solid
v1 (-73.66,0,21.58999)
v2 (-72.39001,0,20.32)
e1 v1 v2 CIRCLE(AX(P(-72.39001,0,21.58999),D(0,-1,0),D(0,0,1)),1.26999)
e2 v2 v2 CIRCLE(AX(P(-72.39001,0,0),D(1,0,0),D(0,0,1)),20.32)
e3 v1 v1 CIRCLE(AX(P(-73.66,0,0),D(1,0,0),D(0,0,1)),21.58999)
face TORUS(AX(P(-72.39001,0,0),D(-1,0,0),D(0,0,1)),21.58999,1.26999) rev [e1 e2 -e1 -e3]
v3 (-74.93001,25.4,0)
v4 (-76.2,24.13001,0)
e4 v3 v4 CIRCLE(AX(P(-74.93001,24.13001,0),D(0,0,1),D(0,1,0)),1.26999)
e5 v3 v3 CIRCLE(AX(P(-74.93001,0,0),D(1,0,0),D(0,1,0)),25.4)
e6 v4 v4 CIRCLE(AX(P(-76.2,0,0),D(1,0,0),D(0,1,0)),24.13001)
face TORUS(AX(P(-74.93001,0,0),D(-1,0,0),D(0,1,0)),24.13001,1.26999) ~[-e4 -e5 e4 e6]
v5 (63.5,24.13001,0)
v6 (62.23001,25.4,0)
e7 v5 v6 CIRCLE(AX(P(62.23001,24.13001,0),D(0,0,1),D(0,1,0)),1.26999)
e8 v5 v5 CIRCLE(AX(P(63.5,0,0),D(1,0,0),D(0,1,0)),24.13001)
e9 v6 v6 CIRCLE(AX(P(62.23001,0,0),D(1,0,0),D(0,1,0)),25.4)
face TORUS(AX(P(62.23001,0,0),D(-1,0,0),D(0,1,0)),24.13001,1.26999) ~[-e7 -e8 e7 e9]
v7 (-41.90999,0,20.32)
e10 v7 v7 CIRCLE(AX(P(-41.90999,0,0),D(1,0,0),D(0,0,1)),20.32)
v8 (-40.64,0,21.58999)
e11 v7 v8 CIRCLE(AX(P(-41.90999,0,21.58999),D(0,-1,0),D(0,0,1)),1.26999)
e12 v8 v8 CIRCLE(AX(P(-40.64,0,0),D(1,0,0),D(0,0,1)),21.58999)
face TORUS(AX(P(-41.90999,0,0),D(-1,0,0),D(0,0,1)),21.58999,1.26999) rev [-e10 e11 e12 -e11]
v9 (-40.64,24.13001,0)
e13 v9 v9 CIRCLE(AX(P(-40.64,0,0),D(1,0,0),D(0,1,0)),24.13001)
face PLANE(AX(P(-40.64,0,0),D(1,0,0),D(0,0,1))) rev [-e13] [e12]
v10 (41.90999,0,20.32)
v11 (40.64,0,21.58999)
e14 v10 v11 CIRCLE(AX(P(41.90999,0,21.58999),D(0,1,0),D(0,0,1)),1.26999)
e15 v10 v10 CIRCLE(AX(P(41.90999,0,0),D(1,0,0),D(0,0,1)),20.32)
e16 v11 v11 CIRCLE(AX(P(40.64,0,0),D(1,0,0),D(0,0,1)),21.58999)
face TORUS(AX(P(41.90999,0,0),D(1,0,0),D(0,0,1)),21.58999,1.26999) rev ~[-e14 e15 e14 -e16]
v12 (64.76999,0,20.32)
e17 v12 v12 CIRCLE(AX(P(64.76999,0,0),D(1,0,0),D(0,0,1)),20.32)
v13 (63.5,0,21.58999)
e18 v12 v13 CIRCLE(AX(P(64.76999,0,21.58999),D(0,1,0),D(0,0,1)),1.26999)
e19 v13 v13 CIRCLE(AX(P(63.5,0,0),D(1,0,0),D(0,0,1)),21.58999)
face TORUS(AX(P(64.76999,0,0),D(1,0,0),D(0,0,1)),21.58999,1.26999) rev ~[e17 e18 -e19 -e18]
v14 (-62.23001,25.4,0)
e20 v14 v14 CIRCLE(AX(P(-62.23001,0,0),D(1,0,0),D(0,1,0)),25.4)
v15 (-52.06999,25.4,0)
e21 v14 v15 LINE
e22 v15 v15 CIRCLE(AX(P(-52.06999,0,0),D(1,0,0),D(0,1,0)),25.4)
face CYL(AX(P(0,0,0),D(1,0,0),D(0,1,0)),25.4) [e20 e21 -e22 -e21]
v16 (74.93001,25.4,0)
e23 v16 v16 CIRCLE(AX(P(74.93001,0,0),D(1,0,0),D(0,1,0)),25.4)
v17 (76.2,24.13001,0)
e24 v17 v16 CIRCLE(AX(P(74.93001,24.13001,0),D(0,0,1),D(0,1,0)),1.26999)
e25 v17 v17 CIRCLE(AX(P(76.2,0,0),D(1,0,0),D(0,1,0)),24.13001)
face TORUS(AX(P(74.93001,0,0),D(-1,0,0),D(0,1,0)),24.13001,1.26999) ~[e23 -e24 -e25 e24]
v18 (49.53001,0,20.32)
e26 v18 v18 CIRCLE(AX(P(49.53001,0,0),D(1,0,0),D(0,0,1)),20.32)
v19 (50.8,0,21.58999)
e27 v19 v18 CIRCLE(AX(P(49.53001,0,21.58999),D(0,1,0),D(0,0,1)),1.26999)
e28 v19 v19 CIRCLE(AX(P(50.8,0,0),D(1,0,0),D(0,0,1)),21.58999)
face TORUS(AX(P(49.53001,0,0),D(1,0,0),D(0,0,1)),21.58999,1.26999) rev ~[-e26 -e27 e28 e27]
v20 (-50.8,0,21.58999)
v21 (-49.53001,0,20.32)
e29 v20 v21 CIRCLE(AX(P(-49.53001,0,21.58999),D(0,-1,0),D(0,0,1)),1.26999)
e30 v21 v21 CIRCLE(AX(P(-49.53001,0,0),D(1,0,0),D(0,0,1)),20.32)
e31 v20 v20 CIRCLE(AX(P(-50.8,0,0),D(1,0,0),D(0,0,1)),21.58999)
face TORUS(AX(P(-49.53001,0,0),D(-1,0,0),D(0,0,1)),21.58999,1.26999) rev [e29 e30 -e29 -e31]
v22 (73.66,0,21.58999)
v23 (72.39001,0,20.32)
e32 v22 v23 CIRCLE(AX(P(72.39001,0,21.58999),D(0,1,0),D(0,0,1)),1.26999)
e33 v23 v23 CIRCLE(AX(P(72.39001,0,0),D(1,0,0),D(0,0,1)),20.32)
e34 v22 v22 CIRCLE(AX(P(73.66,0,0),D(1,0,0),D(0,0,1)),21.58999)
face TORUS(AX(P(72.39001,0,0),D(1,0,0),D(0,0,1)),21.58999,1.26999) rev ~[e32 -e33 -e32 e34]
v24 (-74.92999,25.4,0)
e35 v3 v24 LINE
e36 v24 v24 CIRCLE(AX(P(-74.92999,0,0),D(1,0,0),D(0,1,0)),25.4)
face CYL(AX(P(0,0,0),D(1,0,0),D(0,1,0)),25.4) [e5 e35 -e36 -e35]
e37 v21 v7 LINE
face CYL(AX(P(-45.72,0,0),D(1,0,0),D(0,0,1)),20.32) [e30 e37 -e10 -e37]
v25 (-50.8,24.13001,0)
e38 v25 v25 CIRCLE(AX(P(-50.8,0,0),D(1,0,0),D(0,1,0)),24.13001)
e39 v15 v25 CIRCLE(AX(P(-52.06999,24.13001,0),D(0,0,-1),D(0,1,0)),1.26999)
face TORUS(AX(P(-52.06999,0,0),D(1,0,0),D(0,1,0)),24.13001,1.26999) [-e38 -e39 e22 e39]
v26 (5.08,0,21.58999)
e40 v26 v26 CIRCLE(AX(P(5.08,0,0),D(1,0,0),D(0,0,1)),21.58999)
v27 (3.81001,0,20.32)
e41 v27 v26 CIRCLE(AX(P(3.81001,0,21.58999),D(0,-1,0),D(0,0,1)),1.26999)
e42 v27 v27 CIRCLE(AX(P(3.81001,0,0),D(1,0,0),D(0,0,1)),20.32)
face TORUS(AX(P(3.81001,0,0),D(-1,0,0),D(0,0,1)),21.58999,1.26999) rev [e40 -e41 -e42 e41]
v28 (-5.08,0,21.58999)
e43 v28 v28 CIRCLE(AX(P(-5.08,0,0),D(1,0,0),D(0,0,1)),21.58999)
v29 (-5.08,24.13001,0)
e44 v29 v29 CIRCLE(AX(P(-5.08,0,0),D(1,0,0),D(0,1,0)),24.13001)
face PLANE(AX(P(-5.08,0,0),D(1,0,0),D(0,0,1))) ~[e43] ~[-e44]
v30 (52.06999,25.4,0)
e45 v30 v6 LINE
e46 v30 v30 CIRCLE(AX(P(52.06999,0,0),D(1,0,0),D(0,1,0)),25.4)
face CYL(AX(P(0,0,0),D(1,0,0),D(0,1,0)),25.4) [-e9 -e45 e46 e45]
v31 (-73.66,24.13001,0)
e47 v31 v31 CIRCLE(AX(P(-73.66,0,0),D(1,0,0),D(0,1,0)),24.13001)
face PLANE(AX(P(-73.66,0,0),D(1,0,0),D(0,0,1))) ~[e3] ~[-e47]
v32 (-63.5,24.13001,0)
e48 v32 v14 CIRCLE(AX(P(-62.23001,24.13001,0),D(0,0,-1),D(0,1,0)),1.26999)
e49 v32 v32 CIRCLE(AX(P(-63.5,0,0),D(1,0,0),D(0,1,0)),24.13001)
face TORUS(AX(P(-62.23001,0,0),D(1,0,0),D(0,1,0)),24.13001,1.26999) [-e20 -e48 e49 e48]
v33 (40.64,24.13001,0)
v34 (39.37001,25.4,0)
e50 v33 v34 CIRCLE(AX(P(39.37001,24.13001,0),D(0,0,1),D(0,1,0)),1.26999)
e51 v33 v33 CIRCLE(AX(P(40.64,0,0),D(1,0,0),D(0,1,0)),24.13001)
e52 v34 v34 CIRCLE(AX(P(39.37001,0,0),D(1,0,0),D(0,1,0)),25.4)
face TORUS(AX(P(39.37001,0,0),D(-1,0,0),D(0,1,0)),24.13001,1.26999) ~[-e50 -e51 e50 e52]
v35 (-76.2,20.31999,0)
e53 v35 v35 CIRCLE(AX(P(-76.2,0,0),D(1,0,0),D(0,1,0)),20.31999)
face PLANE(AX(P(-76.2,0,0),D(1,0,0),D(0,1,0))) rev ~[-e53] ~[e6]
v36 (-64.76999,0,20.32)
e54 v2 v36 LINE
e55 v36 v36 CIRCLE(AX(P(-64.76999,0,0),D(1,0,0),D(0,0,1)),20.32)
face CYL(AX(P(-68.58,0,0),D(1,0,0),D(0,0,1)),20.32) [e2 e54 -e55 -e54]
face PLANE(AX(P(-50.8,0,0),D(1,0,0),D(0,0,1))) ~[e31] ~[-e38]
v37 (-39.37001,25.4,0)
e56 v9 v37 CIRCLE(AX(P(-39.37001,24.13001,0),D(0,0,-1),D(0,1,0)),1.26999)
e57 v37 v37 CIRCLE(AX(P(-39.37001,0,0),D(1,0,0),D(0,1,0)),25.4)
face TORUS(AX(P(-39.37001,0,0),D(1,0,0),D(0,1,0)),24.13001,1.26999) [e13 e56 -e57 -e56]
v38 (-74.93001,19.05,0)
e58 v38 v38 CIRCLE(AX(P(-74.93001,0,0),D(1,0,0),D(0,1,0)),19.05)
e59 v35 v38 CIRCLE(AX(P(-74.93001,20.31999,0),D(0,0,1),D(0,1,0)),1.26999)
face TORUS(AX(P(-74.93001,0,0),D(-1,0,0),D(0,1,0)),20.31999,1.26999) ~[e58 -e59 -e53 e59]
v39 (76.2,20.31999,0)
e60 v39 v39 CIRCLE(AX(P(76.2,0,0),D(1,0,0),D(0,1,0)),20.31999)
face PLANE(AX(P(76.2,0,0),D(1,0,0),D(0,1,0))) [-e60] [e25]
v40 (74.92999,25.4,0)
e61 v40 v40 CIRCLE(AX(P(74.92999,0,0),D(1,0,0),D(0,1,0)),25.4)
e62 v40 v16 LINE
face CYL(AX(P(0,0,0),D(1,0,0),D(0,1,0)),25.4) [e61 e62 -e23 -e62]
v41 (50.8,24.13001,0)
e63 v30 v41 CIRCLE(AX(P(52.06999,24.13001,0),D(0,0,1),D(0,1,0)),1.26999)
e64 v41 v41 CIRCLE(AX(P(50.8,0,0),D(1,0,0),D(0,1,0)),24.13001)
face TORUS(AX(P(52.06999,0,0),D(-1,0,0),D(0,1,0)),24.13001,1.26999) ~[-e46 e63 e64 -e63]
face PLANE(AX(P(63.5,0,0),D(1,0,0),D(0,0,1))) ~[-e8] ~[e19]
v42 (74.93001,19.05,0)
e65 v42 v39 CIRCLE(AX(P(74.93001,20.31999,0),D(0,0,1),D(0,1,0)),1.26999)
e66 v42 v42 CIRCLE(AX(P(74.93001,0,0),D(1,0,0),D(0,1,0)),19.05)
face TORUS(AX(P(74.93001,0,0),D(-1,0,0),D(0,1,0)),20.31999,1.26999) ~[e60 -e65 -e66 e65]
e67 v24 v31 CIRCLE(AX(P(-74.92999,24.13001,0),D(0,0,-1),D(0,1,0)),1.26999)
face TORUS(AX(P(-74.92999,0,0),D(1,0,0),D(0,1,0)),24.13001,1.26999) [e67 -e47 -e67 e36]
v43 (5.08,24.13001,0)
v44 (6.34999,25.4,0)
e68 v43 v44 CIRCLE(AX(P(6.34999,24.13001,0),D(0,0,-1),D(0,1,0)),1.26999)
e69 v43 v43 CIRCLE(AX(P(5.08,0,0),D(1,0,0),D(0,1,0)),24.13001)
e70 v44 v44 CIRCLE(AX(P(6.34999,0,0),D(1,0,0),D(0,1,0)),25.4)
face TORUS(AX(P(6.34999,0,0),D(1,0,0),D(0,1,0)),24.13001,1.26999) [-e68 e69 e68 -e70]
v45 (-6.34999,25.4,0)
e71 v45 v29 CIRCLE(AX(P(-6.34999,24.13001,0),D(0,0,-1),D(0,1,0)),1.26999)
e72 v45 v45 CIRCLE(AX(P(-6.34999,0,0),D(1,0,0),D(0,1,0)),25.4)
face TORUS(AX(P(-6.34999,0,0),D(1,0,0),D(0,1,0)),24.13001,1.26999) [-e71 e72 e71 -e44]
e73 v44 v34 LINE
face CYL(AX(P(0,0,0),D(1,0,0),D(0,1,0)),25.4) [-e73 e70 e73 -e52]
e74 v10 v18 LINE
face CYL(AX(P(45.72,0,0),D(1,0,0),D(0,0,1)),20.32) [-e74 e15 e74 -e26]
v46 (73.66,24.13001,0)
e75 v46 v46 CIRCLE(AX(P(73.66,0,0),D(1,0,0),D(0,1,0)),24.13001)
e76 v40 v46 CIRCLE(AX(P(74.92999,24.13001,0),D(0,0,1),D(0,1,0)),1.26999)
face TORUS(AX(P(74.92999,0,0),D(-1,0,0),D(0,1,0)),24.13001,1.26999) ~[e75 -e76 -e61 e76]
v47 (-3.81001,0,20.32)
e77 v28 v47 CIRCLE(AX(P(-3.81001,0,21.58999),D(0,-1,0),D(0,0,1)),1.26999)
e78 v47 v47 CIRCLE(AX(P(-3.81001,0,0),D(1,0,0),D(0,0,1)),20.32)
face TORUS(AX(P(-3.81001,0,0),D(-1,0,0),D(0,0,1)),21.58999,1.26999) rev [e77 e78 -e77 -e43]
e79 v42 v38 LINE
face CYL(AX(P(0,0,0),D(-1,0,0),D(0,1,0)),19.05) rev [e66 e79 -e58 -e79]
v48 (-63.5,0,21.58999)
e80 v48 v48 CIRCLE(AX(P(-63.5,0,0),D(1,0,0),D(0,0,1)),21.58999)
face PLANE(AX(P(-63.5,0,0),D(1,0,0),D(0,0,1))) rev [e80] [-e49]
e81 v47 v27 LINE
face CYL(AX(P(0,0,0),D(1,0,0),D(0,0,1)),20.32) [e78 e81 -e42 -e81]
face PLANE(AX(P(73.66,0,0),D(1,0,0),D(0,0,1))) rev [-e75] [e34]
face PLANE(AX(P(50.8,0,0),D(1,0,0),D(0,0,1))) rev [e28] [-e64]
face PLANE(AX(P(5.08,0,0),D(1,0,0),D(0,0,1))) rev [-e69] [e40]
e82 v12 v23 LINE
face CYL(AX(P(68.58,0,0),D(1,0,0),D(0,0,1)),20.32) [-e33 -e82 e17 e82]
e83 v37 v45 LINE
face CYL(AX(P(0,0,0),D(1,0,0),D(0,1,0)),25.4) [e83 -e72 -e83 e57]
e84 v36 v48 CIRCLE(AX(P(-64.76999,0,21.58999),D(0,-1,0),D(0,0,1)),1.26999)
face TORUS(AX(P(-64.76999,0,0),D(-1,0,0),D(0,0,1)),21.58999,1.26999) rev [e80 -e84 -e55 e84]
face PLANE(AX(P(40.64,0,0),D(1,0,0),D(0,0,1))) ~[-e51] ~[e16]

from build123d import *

# Parameters (mm, degrees)
F0_R     = 25.4
F0_R_2   = 19.05
F1_DEPTH = 76.2
F2_W     = 10.16
F2_H     = 20.32
F4_R     = 1.26999


# Not quite as in the source:
# - a fillet or chamfer is up to 0.001 mm smaller than in the source, because OpenCascade refuses the exact size


with BuildPart() as f1:
    # F0 (on Right) → F1 (new body, symmetric)
    with BuildSketch(Plane.YZ):
        Circle(F0_R)
        Circle(F0_R_2, mode=Mode.SUBTRACT)
    extrude(amount=F1_DEPTH, both=True)

    # F2 (on Front) → F3 (revolve, cut)
    with BuildSketch(Plane.XZ):
        with Locations((-68.58, 30.48)):
            Rectangle(F2_W, F2_H)
        with Locations((-45.72, 30.48)):
            Rectangle(F2_W, F2_H)
        with Locations((0, 30.48)):
            Rectangle(F2_W, F2_H)
        with Locations((45.72, 30.48)):
            Rectangle(F2_W, F2_H)
        with Locations((68.58, 30.48)):
            Rectangle(F2_W, F2_H)
    revolve(axis=Axis((-76.2, 0, 0), (1, 0, 0)), mode=Mode.SUBTRACT)

    # F4 (radius 1.27 in the source; OpenCascade refuses exactly that, so slightly less here)
    f4_edges = [f1.edges().sort_by_distance(p)[0] for p in [
        (-74.93, 25.4, 0),
        (-73.66, -25.4, 0),
        (-76.2, -25.4, 0),
        (-73.66, 0, -20.32),
        (-63.5, 0, -20.32),
        (-68.58, 0, 20.32),
        (-63.5, -25.4, 0),
        (-57.15, 25.4, 0),
        (-50.8, -25.4, 0),
        (-50.8, 0, -20.32),
        (-40.64, 0, -20.32),
        (-45.72, 0, 20.32),
        (-40.64, -25.4, 0),
        (-22.86, 25.4, 0),
        (-5.08, -25.4, 0),
        (-5.08, 0, -20.32),
        (5.08, 0, -20.32),
        (0, 0, 20.32),
        (5.08, -25.4, 0),
        (22.86, 25.4, 0),
        (40.64, -25.4, 0),
        (40.64, 0, -20.32),
        (50.8, 0, -20.32),
        (45.72, 0, 20.32),
        (50.8, -25.4, 0),
        (57.15, 25.4, 0),
        (63.5, -25.4, 0),
        (63.5, 0, -20.32),
        (73.66, 0, -20.32),
        (68.58, 0, 20.32),
        (73.66, -25.4, 0),
        (74.93, 25.4, 0),
        (76.2, -25.4, 0),
        (-76.2, -19.05, 0),
        (76.2, -19.05, 0),
    ]]
    fillet(f4_edges, radius=F4_R)


solid = f1.part
